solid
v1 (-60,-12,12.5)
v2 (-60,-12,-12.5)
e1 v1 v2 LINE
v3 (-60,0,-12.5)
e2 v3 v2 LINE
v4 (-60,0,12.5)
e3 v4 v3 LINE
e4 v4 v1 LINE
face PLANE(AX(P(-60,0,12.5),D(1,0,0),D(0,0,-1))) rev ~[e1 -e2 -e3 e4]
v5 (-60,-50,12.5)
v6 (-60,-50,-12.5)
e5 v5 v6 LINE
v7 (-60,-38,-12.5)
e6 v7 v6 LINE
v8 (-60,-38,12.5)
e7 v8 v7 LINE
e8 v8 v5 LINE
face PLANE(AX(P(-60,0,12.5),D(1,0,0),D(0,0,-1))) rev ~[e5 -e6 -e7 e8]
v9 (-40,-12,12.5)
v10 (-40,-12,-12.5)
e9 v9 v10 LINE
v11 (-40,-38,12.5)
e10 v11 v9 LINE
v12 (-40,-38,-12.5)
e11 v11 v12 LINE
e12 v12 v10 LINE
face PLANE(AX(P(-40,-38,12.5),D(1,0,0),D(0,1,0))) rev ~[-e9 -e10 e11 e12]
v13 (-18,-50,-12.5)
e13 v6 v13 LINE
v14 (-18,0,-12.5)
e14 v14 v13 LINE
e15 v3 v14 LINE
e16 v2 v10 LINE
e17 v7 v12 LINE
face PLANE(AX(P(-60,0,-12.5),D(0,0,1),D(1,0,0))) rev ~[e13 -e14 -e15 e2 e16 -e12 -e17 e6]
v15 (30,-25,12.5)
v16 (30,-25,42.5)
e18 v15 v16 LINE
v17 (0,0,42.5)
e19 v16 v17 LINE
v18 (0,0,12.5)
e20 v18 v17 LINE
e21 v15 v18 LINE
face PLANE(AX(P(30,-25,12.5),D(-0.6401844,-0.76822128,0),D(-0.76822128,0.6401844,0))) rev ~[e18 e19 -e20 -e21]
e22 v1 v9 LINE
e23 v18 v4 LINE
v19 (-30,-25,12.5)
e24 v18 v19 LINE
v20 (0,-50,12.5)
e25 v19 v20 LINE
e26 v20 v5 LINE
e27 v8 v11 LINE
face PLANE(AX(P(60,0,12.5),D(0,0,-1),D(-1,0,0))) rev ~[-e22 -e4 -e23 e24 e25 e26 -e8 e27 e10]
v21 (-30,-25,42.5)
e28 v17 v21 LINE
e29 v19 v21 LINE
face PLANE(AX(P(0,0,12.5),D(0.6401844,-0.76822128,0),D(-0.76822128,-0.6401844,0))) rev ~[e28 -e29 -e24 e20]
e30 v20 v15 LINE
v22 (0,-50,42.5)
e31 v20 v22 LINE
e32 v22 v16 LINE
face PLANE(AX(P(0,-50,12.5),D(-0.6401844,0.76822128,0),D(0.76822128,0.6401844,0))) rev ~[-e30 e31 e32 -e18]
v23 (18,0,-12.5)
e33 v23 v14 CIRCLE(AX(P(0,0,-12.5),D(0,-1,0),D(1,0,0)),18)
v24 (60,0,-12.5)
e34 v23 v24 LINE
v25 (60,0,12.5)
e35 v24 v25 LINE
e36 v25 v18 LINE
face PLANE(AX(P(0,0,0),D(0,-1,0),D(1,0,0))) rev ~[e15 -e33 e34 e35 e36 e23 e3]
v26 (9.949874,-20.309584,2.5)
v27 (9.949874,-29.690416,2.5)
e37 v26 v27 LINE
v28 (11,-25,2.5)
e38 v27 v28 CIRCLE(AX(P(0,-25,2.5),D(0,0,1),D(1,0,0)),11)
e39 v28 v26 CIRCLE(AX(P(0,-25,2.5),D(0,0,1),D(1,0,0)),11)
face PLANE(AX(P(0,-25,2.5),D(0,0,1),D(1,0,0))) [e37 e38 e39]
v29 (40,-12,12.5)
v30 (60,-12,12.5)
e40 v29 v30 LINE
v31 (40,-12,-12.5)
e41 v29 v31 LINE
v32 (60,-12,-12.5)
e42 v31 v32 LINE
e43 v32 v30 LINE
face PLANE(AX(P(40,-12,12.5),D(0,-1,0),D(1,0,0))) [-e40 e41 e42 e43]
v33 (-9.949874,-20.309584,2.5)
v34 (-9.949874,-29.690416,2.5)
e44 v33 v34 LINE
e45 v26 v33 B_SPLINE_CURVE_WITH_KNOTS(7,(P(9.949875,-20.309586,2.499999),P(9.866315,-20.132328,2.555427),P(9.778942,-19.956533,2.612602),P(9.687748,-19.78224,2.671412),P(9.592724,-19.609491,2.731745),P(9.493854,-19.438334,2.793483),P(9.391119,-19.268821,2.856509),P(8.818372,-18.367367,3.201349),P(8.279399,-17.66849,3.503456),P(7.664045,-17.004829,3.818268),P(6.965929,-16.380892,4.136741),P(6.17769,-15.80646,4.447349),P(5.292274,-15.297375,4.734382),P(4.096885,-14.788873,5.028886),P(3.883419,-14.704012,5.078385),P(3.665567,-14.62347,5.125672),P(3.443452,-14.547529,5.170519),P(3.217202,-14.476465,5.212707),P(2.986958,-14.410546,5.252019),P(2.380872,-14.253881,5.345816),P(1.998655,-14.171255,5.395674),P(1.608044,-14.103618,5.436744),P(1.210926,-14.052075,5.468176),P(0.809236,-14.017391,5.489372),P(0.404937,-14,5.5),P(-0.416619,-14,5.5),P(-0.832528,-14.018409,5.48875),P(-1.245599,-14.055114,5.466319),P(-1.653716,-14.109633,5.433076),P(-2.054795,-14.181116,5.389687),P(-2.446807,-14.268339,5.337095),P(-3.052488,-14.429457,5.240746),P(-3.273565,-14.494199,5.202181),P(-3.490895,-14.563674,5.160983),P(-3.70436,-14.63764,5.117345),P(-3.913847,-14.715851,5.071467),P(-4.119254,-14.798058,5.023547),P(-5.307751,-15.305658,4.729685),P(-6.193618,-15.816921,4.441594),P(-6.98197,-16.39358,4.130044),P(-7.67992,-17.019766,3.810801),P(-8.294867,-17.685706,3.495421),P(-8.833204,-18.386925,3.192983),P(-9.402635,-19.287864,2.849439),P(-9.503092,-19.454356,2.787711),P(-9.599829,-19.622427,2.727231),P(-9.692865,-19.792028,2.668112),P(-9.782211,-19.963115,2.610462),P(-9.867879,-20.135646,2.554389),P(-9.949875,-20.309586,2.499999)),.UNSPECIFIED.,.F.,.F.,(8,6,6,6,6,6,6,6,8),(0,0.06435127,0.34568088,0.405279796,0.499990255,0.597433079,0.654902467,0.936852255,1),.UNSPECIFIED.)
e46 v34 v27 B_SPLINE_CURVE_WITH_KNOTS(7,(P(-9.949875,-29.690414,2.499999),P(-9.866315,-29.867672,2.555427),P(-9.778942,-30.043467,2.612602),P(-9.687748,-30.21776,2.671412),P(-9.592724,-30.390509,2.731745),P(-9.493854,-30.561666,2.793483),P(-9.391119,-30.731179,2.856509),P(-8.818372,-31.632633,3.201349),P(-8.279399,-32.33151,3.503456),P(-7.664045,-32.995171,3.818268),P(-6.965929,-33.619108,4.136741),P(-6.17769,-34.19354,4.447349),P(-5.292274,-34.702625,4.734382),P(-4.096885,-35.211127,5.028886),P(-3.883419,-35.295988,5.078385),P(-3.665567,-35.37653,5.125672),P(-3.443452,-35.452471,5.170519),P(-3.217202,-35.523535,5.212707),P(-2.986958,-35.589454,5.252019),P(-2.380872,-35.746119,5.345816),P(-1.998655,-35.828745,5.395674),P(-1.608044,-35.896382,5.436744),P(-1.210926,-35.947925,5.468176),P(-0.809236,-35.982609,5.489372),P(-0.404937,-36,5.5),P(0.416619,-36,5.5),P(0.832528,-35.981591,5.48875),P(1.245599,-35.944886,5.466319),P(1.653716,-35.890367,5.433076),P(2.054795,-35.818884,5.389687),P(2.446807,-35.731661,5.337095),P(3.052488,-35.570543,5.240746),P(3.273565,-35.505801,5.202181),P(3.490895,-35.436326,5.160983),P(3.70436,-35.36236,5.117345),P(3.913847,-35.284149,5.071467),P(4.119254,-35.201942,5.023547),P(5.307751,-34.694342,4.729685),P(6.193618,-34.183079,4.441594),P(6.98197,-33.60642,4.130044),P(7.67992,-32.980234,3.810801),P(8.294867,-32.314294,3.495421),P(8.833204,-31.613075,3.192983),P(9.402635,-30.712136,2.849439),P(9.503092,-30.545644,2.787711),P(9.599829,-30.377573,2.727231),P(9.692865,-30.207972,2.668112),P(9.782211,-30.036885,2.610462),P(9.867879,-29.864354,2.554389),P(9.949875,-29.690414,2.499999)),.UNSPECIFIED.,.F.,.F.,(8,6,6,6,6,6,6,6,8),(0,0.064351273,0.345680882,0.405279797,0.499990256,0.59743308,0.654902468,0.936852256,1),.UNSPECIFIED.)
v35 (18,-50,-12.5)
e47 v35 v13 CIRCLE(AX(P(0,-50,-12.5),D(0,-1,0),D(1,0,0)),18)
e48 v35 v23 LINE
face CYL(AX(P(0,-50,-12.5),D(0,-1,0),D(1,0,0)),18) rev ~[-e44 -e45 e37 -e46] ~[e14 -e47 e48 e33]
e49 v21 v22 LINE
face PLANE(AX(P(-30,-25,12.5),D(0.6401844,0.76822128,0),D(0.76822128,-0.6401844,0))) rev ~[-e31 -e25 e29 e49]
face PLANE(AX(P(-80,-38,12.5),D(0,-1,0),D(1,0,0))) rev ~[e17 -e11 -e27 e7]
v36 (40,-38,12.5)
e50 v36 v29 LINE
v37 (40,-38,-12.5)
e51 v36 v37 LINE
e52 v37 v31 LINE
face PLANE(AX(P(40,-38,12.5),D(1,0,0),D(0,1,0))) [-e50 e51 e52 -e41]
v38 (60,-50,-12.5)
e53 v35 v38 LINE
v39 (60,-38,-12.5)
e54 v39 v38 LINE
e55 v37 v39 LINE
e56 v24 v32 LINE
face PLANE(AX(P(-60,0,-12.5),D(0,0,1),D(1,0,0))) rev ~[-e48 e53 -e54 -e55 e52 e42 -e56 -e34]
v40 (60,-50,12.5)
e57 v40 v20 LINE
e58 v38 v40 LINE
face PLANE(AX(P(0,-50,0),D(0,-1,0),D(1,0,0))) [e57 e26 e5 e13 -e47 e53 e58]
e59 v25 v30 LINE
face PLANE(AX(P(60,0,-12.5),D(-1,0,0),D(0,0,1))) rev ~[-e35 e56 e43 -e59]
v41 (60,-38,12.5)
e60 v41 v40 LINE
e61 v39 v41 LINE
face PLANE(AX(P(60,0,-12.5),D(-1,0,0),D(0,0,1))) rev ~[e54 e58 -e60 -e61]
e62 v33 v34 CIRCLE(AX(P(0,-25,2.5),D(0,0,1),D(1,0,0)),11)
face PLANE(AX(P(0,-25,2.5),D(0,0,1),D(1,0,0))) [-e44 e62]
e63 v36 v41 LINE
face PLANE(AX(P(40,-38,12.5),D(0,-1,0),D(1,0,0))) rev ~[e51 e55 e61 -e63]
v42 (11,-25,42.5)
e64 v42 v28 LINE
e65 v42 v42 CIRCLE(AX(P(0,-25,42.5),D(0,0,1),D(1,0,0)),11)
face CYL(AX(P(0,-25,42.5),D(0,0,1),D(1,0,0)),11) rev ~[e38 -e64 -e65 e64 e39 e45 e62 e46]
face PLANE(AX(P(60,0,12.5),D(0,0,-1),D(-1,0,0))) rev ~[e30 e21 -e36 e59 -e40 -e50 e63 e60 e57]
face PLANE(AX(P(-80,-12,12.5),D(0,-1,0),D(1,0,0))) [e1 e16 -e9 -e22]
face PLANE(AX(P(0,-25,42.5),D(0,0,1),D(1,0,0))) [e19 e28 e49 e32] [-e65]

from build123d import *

# Parameters (mm, degrees)
F1_DEPTH = 50
F2_R     = 18
F3_DEPTH = 60
F4_W     = 40
F4_H     = 26
F5_DEPTH = 25
F7_DEPTH = 30
F8_R     = 11
F9_DEPTH = 40


# Not quite as in the source:
# - a feature names something its author has since deleted; it is built from what else it names


with BuildPart() as f1:
    # F0 (on Front) → F1 (new body)
    with BuildSketch(Plane.XZ):
        Polygon((-60, 12.5), (-60, -12.5), (60, -12.5), (60, 12.5), (30, 12.5), (-30, 12.5), align=None)
    extrude(amount=F1_DEPTH)

    # F2 (on face) → F3 (cut)
    with BuildSketch(Plane.XZ.offset(50)):
        with Locations((0, -12.5)):
            Circle(F2_R)
    extrude(amount=-F3_DEPTH, mode=Mode.SUBTRACT)

    # F4 (on face) → F5 (cut)
    with BuildSketch(Plane.XY.offset(12.5)):
        with Locations((-60, -25)):
            Rectangle(F4_W, F4_H)
        with Locations((60, -25)):
            Rectangle(F4_W, F4_H)
    extrude(amount=-F5_DEPTH, mode=Mode.SUBTRACT)

    # F6 (on face) → F7 (join)
    with BuildSketch(Plane.XY.offset(12.5)):
        Polygon((30, -25), (0, 0), (-30, -25), (0, -50), align=None)
    extrude(amount=F7_DEPTH)

    # F8 (on face) → F9 (cut)
    with BuildSketch(Plane.XY.offset(42.5)):
        with Locations((0, -25)):
            Circle(F8_R)
    extrude(amount=-F9_DEPTH, mode=Mode.SUBTRACT)


solid = f1.part
